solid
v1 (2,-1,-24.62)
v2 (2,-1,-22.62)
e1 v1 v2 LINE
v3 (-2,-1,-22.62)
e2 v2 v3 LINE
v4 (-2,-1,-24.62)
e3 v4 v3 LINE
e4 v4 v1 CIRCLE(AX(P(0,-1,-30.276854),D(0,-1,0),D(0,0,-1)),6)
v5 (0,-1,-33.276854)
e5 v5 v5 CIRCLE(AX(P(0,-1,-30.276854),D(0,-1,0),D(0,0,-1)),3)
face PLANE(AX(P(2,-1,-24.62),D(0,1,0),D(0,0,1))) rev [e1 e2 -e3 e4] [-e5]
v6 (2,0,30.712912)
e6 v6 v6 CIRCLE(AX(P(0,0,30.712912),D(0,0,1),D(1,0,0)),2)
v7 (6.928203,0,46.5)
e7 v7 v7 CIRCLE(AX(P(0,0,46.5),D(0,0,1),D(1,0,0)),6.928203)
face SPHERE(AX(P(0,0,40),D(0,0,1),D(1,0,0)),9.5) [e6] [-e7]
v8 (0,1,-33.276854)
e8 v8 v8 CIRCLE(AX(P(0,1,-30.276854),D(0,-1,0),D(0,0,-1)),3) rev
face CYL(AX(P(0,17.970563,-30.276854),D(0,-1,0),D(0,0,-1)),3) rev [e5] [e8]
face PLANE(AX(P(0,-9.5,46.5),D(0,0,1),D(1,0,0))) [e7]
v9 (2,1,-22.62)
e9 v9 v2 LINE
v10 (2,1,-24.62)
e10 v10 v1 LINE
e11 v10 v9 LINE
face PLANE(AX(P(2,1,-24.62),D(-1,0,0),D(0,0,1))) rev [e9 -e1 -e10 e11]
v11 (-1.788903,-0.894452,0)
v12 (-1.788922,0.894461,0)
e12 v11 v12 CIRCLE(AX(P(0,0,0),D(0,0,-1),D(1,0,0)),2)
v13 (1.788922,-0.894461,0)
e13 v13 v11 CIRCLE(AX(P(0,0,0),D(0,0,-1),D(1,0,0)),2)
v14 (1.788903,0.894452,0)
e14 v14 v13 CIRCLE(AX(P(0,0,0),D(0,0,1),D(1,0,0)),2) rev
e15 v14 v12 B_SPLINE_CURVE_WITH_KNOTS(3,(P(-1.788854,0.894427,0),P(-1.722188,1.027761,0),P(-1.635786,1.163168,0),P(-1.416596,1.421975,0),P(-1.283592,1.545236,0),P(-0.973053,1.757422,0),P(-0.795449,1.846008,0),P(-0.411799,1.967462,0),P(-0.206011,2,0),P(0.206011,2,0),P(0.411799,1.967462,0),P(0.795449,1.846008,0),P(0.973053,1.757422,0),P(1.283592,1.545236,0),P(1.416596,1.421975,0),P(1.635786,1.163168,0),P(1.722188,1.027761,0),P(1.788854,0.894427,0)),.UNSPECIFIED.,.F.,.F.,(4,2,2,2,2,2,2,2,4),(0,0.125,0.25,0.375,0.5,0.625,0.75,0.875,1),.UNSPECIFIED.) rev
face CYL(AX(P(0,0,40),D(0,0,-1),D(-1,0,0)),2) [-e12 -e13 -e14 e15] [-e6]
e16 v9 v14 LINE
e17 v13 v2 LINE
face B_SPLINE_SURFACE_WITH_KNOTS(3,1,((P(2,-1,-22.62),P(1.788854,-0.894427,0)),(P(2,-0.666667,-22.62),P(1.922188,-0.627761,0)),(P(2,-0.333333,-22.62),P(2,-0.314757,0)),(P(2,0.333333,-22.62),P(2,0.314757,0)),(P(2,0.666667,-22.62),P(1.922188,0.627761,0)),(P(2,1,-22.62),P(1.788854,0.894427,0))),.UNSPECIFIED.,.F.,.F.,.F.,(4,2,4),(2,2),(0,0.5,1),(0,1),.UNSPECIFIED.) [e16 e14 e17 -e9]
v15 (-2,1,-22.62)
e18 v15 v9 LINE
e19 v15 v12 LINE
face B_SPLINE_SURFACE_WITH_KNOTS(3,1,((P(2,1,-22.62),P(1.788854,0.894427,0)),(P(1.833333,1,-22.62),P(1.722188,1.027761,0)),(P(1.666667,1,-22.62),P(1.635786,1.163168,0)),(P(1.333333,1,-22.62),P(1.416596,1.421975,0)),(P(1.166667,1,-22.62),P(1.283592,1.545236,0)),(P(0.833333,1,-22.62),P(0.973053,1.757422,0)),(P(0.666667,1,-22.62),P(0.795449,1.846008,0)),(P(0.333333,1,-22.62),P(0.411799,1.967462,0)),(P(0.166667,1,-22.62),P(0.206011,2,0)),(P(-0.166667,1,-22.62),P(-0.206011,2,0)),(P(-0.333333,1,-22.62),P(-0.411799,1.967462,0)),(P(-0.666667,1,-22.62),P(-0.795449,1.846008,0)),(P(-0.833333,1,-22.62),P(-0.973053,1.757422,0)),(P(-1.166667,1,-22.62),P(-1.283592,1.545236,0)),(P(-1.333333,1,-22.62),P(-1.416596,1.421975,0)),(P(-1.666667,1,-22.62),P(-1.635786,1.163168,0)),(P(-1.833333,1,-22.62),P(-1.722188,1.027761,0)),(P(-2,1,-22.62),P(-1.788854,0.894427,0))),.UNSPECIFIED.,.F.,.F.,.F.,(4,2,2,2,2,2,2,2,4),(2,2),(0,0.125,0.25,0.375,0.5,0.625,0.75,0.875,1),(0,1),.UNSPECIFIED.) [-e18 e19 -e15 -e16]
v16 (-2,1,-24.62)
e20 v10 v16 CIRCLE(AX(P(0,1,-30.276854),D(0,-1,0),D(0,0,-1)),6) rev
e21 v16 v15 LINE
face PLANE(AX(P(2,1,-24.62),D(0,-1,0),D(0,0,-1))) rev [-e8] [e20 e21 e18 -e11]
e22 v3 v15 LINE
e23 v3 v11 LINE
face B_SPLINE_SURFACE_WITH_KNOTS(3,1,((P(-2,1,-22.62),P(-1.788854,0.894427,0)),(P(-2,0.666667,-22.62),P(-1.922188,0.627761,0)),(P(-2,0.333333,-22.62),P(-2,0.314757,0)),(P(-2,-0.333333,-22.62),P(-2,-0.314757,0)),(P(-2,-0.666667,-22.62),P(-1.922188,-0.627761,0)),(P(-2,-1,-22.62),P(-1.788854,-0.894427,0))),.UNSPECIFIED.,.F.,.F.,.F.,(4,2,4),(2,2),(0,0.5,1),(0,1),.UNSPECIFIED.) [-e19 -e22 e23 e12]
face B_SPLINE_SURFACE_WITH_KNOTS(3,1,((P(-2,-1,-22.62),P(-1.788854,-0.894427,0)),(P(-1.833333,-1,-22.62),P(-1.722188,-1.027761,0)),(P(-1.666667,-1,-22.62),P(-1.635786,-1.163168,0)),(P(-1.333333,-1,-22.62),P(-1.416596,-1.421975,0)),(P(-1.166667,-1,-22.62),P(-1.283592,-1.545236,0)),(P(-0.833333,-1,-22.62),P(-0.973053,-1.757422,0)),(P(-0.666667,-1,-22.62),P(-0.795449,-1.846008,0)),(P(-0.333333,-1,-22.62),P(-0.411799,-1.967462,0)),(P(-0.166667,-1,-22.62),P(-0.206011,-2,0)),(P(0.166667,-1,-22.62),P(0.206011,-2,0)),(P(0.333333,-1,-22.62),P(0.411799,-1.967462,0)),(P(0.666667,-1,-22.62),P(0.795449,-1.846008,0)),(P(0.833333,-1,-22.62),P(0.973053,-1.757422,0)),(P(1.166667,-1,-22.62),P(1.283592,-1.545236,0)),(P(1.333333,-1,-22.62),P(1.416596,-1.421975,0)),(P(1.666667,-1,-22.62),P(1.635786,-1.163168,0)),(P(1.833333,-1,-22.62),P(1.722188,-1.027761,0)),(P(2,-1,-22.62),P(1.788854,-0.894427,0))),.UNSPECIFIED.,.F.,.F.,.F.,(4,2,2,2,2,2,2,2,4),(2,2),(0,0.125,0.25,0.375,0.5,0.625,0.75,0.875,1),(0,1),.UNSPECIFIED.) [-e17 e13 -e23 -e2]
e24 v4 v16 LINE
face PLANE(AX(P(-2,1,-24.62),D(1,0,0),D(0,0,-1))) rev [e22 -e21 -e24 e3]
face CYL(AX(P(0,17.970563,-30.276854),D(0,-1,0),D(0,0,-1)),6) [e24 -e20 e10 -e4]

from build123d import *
from build123d.topology import SkipClean

# Parameters (mm, degrees)
SKETCH1_R               = 2
BOSS_EXTRUDE1_DEPTH     = 40
BOSS_EXTRUDE2_START     = 50
BOSS_EXTRUDE2_DEPTH     = 50
SKETCH6_R               = 6.287980689
SKETCH6_R_2             = 2
BOSS_EXTRUDE4_DEPTH     = 2
SKETCH7_R               = 6
BOSS_EXTRUDE5_DEPTH     = 2
CUT_EXTRUDE4_DEPTH      = 65.01163724
CUT_EXTRUDE4_DEPTH_BACK = 65.01163724
SKETCH13_R              = 6
CUT_EXTRUDE5_DEPTH      = 52.290837388
SKETCH14_R              = 2
CUT_EXTRUDE6_DEPTH      = 52.290837388
CUT_EXTRUDE7_DEPTH      = 52.290837388
CUT_EXTRUDE7_DEPTH_BACK = 52.290837388
CUT_EXTRUDE8_START      = -9.5
CUT_EXTRUDE8_DEPTH      = 19
SKETCH27_W              = 4
SKETCH27_H              = 2
BOSS_EXTRUDE6_DEPTH     = 2
SKETCH28_R              = 6
SKETCH28_R_2            = 3
BOSS_EXTRUDE7_DEPTH     = 2


with BuildPart() as part:
    # Sketch1 → Boss-Extrude1 (new body)
    with BuildSketch(Plane.XY):
        Circle(SKETCH1_R)
    extrude(amount=BOSS_EXTRUDE1_DEPTH)

    # Sketch2 → Revolve1 (revolve)
    with BuildSketch(Plane(origin=(0, 0, 0), x_dir=(1, 0, 0), z_dir=(0, 1, 0))):
        with BuildLine():
            Line((-9.5, -40), (9.5, -40))
            ThreePointArc((9.5, -40), (0, -30.5), (-9.5, -40))
        make_face()
    revolve(axis=Axis((-9.5, 0, 40), (1, 0, 0)))

    # Sketch3 → Boss-Extrude2 (add)
    with SkipClean():  # the faces are left unmerged after this step: merging them gives an invalid solid
        with BuildSketch(Plane(origin=(0, 0, 0), x_dir=(-1, 0, 0), z_dir=(0, 0, -1)).offset(BOSS_EXTRUDE2_START)):
            with BuildLine():
                Line((1, -1.732050808), (1, 1.732050808))
                ThreePointArc((1, 1.732050808), (0, 2), (-1, 1.732050808))
                Line((-1, 1.732050808), (-1, -1.732050808))
                ThreePointArc((-1, -1.732050808), (0, -2), (1, -1.732050808))
            make_face()
        extrude(amount=-BOSS_EXTRUDE2_DEPTH)

    # Sketch6 → Boss-Extrude4 (add)
    with SkipClean():  # the faces are left unmerged after this step: merging them gives an invalid solid
        with BuildSketch(Plane.ZY.offset(1)):
            with Locations((-55.961434487, 0)):
                Circle(SKETCH6_R)
            with Locations((-55.961434487, 0)):
                Circle(SKETCH6_R_2, mode=Mode.SUBTRACT)
        extrude(amount=-BOSS_EXTRUDE4_DEPTH)

    # Sketch7 → Boss-Extrude5 (add)
    with SkipClean():  # the faces are left unmerged after this step: merging them gives an invalid solid
        with BuildSketch(Plane(origin=(0, 0, 0), x_dir=(1, 0, 0), z_dir=(0, 1, 0))):
            with Locations((0, 30.624189127)):
                Circle(SKETCH7_R)
        extrude(amount=-BOSS_EXTRUDE5_DEPTH)

    # Sketch12 → Cut-Extrude4 (cut, two sides: drawn at the far end of the back side and taken through both)
    with SkipClean():  # the faces are left unmerged after this step: merging them gives an invalid solid
        with BuildSketch(Plane.XZ.offset(2).offset(-CUT_EXTRUDE4_DEPTH_BACK)):
            with BuildLine():
                ThreePointArc((0, -36.624189127), (-4.242640687, -34.866829814), (-6, -30.624189127))
                Line((-6, -30.624189127), (-11.247801092, -63.947701612))
                Line((-11.247801092, -63.947701612), (13.319481656, -63.947701612))
                Line((13.319481656, -63.947701612), (6, -30.624189127))
                ThreePointArc((6, -30.624189127), (4.242640687, -34.866829814), (0, -36.624189127))
            make_face()
        extrude(amount=CUT_EXTRUDE4_DEPTH + CUT_EXTRUDE4_DEPTH_BACK, mode=Mode.SUBTRACT)

    # Sketch13 → Cut-Extrude5 (cut, through all)
    with SkipClean():  # the faces are left unmerged after this step: merging them gives an invalid solid
        with BuildSketch(Plane(origin=(0, 0, 0), x_dir=(1, 0, 0), z_dir=(0, 1, 0))):
            with Locations((0, 30.624189127)):
                Circle(SKETCH13_R)
        extrude(amount=CUT_EXTRUDE5_DEPTH, mode=Mode.SUBTRACT)

    # Sketch14 → Cut-Extrude6 (cut, through all)
    with SkipClean():  # the faces are left unmerged after this step: merging them gives an invalid solid
        with BuildSketch(Plane(origin=(0, 0, 0), x_dir=(1, 0, 0), z_dir=(0, 1, 0))):
            with Locations(Location((0, 30.624189127, 0), (0, 0, 270))):
                Circle(SKETCH14_R)
        extrude(amount=-CUT_EXTRUDE6_DEPTH, mode=Mode.SUBTRACT)

    # Sketch17 → Cut-Extrude7 (cut, two sides: drawn at the far end of the back side and taken through both)
    with BuildSketch(Plane(origin=(0, 0, 0), x_dir=(1, 0, 0), z_dir=(0, 1, 0)).offset(-CUT_EXTRUDE7_DEPTH_BACK)):
        Polygon((-3.165261595, 0), (5.14515748, 0), (12.375060686, 39.939772325), (-18.008437574, 39.939772325), align=None)
    extrude(amount=CUT_EXTRUDE7_DEPTH + CUT_EXTRUDE7_DEPTH_BACK, mode=Mode.SUBTRACT)

    # Loft1: read off the stored shape, not the designer's step
    # Loft1: loft between two sections, ruled curve by curve
    loft1_from = [
        Edge.make_bspline([(2, -1, -22.62), (2, -0.666666667, -22.62), (2, -0.333333333, -22.62), (2, 0.333333333, -22.62), (2, 0.666666667, -22.62), (2, 1, -22.62)], [0, 0, 0, 0, 0.5, 0.5, 1, 1, 1, 1], 3),
        Edge.make_bspline([(2, 1, -22.62), (1.833333333, 1, -22.62), (1.666666667, 1, -22.62), (1.333333333, 1, -22.62), (1.166666667, 1, -22.62), (0.833333333, 1, -22.62), (0.666666667, 1, -22.62), (0.333333333, 1, -22.62), (0.166666667, 1, -22.62), (-0.166666667, 1, -22.62), (-0.333333333, 1, -22.62), (-0.666666667, 1, -22.62), (-0.833333333, 1, -22.62), (-1.166666667, 1, -22.62), (-1.333333333, 1, -22.62), (-1.666666667, 1, -22.62), (-1.833333333, 1, -22.62), (-2, 1, -22.62)], [0, 0, 0, 0, 0.125, 0.125, 0.25, 0.25, 0.375, 0.375, 0.5, 0.5, 0.625, 0.625, 0.75, 0.75, 0.875, 0.875, 1, 1, 1, 1], 3),
        Edge.make_bspline([(-2, -1, -22.62), (-1.833333333, -1, -22.62), (-1.666666667, -1, -22.62), (-1.333333333, -1, -22.62), (-1.166666667, -1, -22.62), (-0.833333333, -1, -22.62), (-0.666666667, -1, -22.62), (-0.333333333, -1, -22.62), (-0.166666667, -1, -22.62), (0.166666667, -1, -22.62), (0.333333333, -1, -22.62), (0.666666667, -1, -22.62), (0.833333333, -1, -22.62), (1.166666667, -1, -22.62), (1.333333333, -1, -22.62), (1.666666667, -1, -22.62), (1.833333333, -1, -22.62), (2, -1, -22.62)], [0, 0, 0, 0, 0.125, 0.125, 0.25, 0.25, 0.375, 0.375, 0.5, 0.5, 0.625, 0.625, 0.75, 0.75, 0.875, 0.875, 1, 1, 1, 1], 3),
        Edge.make_bspline([(-2, 1, -22.62), (-2, 0.666666667, -22.62), (-2, 0.333333333, -22.62), (-2, -0.333333333, -22.62), (-2, -0.666666667, -22.62), (-2, -1, -22.62)], [0, 0, 0, 0, 0.5, 0.5, 1, 1, 1, 1], 3),
    ]
    loft1_to = [
        Edge.make_bspline([(1.788854382, -0.894427191, 0), (1.922187715, -0.627760524, 0), (2, -0.314757303, 0), (2, 0.314757303, 0), (1.922187715, 0.627760524, 0), (1.788854382, 0.894427191, 0)], [0, 0, 0, 0, 0.5, 0.5, 1, 1, 1, 1], 3),
        Edge.make_bspline([(1.788854382, 0.894427191, 0), (1.722187715, 1.027760524, 0), (1.635785936, 1.163168367, 0), (1.416595823, 1.421974878, 0), (1.283592091, 1.545236413, 0), (0.973053395, 1.757421782, 0), (0.795448844, 1.846008062, 0), (0.411798664, 1.96746194, 0), (0.20601133, 2, 0), (-0.20601133, 2, 0), (-0.411798664, 1.96746194, 0), (-0.795448844, 1.846008062, 0), (-0.973053395, 1.757421782, 0), (-1.283592091, 1.545236413, 0), (-1.416595823, 1.421974878, 0), (-1.635785936, 1.163168367, 0), (-1.722187715, 1.027760524, 0), (-1.788854382, 0.894427191, 0)], [0, 0, 0, 0, 0.125, 0.125, 0.25, 0.25, 0.375, 0.375, 0.5, 0.5, 0.625, 0.625, 0.75, 0.75, 0.875, 0.875, 1, 1, 1, 1], 3),
        Edge.make_bspline([(-1.788854382, -0.894427191, 0), (-1.722187715, -1.027760524, 0), (-1.635785936, -1.163168367, 0), (-1.416595823, -1.421974878, 0), (-1.283592091, -1.545236413, 0), (-0.973053395, -1.757421782, 0), (-0.795448844, -1.846008062, 0), (-0.411798664, -1.96746194, 0), (-0.20601133, -2, 0), (0.20601133, -2, 0), (0.411798664, -1.96746194, 0), (0.795448844, -1.846008062, 0), (0.973053395, -1.757421782, 0), (1.283592091, -1.545236413, 0), (1.416595823, -1.421974878, 0), (1.635785936, -1.163168367, 0), (1.722187715, -1.027760524, 0), (1.788854382, -0.894427191, 0)], [0, 0, 0, 0, 0.125, 0.125, 0.25, 0.25, 0.375, 0.375, 0.5, 0.5, 0.625, 0.625, 0.75, 0.75, 0.875, 0.875, 1, 1, 1, 1], 3),
        Edge.make_bspline([(-1.788854382, 0.894427191, 0), (-1.922187715, 0.627760524, 0), (-2, 0.314757303, 0), (-2, -0.314757303, 0), (-1.922187715, -0.627760524, 0), (-1.788854382, -0.894427191, 0)], [0, 0, 0, 0, 0.5, 0.5, 1, 1, 1, 1], 3),
    ]
    loft1 = Solid(Shell([*[Face.make_surface_from_curves(loft1_from[k], loft1_to[k]) for k in range(4)], Face(Wire(loft1_from)), Face(Wire(loft1_to))]))
    add(loft1)

    # Cut-Extrude8: read off the stored shape, not the designer's step
    # Cut-Extrude8 outline → Cut-Extrude8 (cut)
    with BuildSketch(Plane(origin=(0, 0, 0), x_dir=(1, 0, 0), z_dir=(0, 1, 0)).offset(CUT_EXTRUDE8_START)):
        Polygon((11.636871943, -46.5), (0, -46.5), (-8.237645066, -46.5), (-8.237645066, -52.129858531), (11.636871943, -52.129858531), align=None)
    extrude(amount=CUT_EXTRUDE8_DEPTH, mode=Mode.SUBTRACT)

    # Sketch27 → Boss-Extrude6 (add)
    with BuildSketch(Plane(origin=(0, 0, -22.62), x_dir=(-1, 0, 0), z_dir=(0, 0, -1))):
        Rectangle(SKETCH27_W, SKETCH27_H)
    extrude(amount=BOSS_EXTRUDE6_DEPTH)

    # Sketch28 → Boss-Extrude7 (add)
    with BuildSketch(Plane.XZ.offset(1)):
        with Locations((0, -30.276854249)):
            Circle(SKETCH28_R)
        with Locations(Location((0, -30.276854249, 0), (0, 0, 270))):
            Circle(SKETCH28_R_2, mode=Mode.SUBTRACT)
    extrude(amount=-BOSS_EXTRUDE7_DEPTH)


solid = part.part
